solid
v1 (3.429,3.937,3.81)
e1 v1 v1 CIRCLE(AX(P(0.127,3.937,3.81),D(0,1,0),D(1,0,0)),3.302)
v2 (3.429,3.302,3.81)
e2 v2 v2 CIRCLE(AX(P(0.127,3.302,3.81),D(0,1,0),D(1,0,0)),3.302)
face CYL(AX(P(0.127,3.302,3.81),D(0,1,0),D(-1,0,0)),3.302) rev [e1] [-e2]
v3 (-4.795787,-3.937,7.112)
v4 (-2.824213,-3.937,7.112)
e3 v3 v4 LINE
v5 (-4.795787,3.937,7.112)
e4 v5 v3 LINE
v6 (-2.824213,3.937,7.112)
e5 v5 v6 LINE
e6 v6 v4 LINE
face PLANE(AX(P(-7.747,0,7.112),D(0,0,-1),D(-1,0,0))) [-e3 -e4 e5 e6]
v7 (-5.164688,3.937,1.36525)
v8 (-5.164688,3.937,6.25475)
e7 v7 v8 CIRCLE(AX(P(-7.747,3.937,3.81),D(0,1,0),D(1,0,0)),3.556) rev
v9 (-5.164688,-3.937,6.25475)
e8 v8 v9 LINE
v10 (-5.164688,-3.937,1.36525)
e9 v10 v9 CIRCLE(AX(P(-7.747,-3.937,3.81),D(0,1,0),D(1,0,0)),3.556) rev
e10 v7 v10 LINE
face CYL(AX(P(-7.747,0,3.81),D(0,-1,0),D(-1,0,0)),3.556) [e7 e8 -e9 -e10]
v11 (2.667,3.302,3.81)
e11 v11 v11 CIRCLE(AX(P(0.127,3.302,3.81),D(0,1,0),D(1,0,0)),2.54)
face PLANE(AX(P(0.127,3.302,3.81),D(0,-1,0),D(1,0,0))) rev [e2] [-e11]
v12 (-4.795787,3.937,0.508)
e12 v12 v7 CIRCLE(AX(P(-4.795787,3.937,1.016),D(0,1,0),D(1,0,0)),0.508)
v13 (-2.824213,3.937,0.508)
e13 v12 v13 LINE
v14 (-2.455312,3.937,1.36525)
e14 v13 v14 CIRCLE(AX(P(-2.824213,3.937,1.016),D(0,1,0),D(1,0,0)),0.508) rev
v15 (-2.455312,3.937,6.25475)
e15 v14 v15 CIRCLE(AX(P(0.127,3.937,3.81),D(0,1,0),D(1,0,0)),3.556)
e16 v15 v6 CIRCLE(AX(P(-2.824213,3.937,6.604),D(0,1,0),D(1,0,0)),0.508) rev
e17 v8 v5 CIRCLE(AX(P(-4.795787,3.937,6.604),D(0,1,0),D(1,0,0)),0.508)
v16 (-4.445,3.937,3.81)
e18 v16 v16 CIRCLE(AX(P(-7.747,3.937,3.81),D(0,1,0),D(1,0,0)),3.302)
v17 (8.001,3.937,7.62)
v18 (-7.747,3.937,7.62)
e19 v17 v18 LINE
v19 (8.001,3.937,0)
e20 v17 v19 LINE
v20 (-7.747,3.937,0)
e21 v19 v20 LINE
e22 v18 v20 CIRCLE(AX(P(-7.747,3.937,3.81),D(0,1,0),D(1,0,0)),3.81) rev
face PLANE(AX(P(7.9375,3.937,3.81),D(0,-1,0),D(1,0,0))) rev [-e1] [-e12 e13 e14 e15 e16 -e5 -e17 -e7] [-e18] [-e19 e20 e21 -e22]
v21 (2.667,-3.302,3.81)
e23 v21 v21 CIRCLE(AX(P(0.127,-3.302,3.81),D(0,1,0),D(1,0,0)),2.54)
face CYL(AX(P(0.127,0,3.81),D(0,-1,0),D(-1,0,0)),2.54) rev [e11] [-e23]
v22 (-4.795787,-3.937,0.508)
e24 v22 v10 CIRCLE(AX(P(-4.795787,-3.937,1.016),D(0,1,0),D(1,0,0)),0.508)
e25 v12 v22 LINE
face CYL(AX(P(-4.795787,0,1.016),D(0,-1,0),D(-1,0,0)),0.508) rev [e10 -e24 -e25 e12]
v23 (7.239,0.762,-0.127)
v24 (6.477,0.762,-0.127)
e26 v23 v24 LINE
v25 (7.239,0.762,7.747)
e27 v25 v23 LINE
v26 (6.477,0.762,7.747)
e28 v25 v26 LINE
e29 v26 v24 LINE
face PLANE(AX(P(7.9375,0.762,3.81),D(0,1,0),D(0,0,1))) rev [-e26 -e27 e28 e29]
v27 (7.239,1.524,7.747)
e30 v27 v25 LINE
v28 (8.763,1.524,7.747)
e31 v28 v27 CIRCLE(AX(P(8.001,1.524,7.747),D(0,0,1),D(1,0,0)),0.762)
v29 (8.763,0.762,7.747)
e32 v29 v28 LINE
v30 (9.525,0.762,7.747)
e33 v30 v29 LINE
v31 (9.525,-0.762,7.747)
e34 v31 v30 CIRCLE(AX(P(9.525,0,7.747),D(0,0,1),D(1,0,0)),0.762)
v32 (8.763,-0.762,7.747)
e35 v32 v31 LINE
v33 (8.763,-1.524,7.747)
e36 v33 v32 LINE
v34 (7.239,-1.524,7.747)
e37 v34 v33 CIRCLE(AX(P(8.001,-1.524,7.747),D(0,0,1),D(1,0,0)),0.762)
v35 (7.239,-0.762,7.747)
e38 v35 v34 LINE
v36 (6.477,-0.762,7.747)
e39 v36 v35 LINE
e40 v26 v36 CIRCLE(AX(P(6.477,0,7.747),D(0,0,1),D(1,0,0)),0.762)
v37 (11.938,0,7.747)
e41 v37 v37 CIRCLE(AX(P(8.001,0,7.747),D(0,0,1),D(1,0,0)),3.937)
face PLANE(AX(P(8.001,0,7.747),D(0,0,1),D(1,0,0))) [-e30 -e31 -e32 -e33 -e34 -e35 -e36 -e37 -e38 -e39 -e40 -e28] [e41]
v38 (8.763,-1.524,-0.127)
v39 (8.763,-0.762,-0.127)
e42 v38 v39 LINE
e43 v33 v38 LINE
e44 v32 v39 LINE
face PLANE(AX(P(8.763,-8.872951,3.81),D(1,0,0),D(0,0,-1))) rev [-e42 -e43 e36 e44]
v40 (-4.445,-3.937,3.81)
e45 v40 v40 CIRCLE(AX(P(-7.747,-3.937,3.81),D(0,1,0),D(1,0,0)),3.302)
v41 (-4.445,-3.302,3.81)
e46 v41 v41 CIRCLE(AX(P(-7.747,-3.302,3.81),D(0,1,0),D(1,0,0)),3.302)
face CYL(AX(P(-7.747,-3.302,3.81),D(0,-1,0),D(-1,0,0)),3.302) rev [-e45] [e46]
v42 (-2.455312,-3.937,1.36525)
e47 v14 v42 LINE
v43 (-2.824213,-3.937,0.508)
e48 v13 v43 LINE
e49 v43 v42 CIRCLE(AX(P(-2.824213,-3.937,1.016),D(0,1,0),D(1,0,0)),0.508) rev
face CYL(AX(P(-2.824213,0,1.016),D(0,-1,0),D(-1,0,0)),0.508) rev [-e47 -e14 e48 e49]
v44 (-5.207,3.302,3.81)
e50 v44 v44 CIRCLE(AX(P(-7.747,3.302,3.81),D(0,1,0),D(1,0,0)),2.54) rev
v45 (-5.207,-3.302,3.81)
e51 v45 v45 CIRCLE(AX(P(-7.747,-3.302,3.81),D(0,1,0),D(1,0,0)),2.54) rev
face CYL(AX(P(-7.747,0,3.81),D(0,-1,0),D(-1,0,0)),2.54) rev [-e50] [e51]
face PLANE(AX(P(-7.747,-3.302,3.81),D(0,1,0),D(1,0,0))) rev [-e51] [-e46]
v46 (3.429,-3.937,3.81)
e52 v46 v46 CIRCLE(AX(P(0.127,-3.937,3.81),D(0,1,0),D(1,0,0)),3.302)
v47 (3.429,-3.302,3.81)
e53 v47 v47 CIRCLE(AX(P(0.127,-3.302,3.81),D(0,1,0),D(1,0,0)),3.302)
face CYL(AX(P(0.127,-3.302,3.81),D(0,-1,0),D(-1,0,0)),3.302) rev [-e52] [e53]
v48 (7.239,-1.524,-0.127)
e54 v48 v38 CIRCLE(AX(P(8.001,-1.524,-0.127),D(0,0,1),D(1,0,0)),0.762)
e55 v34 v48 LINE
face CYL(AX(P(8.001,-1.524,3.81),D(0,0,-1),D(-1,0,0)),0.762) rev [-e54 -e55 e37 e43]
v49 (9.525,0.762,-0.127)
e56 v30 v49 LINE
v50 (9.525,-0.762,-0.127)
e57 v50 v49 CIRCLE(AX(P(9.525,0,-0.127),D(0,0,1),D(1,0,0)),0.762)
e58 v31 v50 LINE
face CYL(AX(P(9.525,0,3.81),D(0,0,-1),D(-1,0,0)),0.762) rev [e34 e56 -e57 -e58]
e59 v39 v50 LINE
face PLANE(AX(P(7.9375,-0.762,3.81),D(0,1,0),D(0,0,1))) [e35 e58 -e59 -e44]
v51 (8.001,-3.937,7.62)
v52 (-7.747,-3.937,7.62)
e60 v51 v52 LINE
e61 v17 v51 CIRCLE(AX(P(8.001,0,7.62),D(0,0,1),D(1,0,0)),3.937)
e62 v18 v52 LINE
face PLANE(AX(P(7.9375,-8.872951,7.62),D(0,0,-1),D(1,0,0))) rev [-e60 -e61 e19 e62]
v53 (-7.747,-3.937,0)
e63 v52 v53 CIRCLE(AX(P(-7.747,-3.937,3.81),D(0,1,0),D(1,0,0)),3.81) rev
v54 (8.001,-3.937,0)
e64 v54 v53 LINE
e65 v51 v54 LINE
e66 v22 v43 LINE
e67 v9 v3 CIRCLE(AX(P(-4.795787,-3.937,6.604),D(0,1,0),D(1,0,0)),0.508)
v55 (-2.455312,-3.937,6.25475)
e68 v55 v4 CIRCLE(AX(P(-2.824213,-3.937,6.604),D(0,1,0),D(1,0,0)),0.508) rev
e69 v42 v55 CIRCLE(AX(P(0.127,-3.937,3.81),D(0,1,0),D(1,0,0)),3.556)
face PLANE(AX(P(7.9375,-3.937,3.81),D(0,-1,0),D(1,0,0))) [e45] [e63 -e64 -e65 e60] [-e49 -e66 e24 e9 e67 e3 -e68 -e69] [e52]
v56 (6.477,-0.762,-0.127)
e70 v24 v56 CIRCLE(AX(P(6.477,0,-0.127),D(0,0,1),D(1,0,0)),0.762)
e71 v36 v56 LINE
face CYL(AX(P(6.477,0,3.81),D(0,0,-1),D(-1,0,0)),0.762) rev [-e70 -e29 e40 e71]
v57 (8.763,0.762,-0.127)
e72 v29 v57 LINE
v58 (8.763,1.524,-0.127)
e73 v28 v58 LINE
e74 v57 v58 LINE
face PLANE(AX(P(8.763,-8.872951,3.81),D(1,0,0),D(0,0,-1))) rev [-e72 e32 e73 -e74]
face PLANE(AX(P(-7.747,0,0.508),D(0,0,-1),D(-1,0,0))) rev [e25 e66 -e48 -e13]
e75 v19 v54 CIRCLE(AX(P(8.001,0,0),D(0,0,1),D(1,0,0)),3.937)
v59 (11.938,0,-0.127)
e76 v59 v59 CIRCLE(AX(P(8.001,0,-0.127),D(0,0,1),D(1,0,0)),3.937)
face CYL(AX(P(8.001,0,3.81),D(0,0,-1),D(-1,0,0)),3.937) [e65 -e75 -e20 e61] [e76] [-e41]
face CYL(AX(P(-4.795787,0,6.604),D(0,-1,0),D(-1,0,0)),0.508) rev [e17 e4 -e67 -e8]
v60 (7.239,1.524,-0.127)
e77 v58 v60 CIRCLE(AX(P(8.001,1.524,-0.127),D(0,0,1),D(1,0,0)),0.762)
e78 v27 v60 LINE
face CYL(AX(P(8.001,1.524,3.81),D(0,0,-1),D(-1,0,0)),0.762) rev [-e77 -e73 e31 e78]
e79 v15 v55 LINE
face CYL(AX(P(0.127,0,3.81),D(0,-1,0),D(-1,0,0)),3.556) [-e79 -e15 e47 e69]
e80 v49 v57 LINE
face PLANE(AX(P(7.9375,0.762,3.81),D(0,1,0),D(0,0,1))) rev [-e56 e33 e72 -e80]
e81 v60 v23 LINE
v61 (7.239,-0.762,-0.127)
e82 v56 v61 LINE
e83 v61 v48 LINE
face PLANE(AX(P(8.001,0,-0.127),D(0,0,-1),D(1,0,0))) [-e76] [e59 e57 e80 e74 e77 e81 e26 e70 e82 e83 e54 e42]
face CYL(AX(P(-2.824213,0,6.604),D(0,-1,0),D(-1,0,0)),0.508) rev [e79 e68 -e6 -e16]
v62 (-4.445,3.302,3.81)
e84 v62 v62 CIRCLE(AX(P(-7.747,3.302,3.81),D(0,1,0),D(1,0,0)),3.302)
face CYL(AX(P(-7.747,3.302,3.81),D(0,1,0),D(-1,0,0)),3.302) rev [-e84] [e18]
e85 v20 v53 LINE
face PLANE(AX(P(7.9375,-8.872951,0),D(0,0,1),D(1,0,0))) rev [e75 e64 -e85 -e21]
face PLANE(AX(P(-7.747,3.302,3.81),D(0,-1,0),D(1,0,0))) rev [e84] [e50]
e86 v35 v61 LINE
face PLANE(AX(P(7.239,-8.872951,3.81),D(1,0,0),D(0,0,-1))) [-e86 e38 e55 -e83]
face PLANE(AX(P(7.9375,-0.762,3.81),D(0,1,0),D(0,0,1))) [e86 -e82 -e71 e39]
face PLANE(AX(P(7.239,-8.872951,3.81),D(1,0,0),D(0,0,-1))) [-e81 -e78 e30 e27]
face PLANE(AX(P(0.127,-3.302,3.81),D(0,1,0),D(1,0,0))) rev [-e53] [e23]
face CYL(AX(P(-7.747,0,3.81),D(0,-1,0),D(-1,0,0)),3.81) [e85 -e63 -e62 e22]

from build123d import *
from build123d.topology import SkipClean

# Parameters (mm, degrees)
SKETCH1_R                   = 3.429
SKETCH1_R_2                 = 2.54
BOSS_EXTRUDE1_DEPTH         = 3.81
TWOSTRAIGHT_START           = -0.623499004
TWOSTRAIGHT_OUTLINE_R       = 2.54
TWOSTRAIGHT_DEPTH           = 6.604
TWOSTRAIGHT_START_2         = -1.258499004
TWOSTRAIGHT_2_OUTLINE_R     = 3.302
TWOSTRAIGHT_2_DEPTH         = 7.874
BODY_MOVE_COPY3_START       = -4.724057793
BODY_MOVE_COPY3_OUTLINE_R   = 2.54
BODY_MOVE_COPY3_DEPTH       = 7.62
BODY_MOVE_COPY3_2_OUTLINE_R = 2.54
BODY_MOVE_COPY3_2_DEPTH     = 0.787057793
BODY_MOVE_COPY3_START_2     = -3.937
BODY_MOVE_COPY3_3_OUTLINE_R = 2.54
BODY_MOVE_COPY3_3_DEPTH     = 0.635
BODY_MOVE_COPY3_START_3     = -3.302
BODY_MOVE_COPY3_4_OUTLINE_R = 2.54
BODY_MOVE_COPY3_4_DEPTH     = 6.604
BODY_MOVE_COPY3_5_OUTLINE_R = 3.302
BODY_MOVE_COPY3_5_DEPTH     = 7.874
BOSS_EXTRUDE2_DEPTH         = 7.874
BOSS_EXTRUDE3_DEPTH         = 7.874
SKETCH4_R                   = 3.937
BOSS_EXTRUDE4_DEPTH         = 0.127


# Read off the part's stored shape, not the designer's step: TwoStraight, Body-Move/Copy3
with BuildPart() as part:
    # Sketch1 → Boss-Extrude1 (new body)
    # profile 1 of 3: a face of its own
    with BuildSketch(Plane.XY):
        with BuildLine():
            Line((3.937, -3.937), (8.001, -3.937))
            ThreePointArc((8.001, -3.937), (11.938, 0), (8.001, 3.937))
            Line((8.001, 3.937), (3.937, 3.937))
            Line((3.937, 3.937), (3.937, -3.937))
        make_face()
        with Locations((8.001, 0)):
            Circle(SKETCH1_R, mode=Mode.SUBTRACT)
    # profile 2 of 3: a face of its own
    with BuildSketch(Plane.XY):
        with Locations((8.001, 0)):
            Circle(SKETCH1_R)
        with Locations((8.001, 0)):
            Circle(SKETCH1_R_2, mode=Mode.SUBTRACT)
    # profile 3 of 3: a face of its own
    with BuildSketch(Plane.XY):
        with Locations((8.001, 0)):
            Circle(SKETCH1_R_2)
        with BuildLine():
            ThreePointArc((6.477, -0.762), (5.715, 0), (6.477, 0.762))
            Line((6.477, 0.762), (7.239, 0.762))
            Line((7.239, 0.762), (7.239, 1.524))
            ThreePointArc((7.239, 1.524), (8.001, 2.286), (8.763, 1.524))
            Line((8.763, 1.524), (8.763, 0.762))
            Line((8.763, 0.762), (9.525, 0.762))
            ThreePointArc((9.525, 0.762), (10.287, 0), (9.525, -0.762))
            Line((9.525, -0.762), (8.763, -0.762))
            Line((8.763, -0.762), (8.763, -1.524))
            ThreePointArc((8.763, -1.524), (8.001, -2.286), (7.239, -1.524))
            Line((7.239, -1.524), (7.239, -0.762))
            Line((7.239, -0.762), (6.477, -0.762))
        make_face(mode=Mode.SUBTRACT)
    extrude(amount=BOSS_EXTRUDE1_DEPTH)

    # Mirror1: part across plane


with BuildPart() as part_1:
    add(part.part)
    add(part.part.mirror(Plane(origin=(7.9375, -8.872950752, 3.81), x_dir=(1, 0, 0), z_dir=(0, 0, 1))))



with BuildPart() as body_2:
    # TwoStraight outline → TwoStraight (new body)
    with BuildSketch(Plane.XY.offset(TWOSTRAIGHT_START)):
        with BuildLine():
            ThreePointArc((-13.491428018, 2.895942207), (-17.301428018, -0.914057793), (-13.491428018, -4.724057793))
            Line((-13.491428018, -4.724057793), (-5.617428018, -4.724057793))
            ThreePointArc((-5.617428018, -4.724057793), (-1.807428018, -0.914057793), (-5.617428018, 2.895942207))
            Line((-5.617428018, 2.895942207), (-13.491428018, 2.895942207))
        make_face()
        with BuildLine():
            Line((-10.540214708, 2.387942207), (-8.568641328, 2.387942207))
            ThreePointArc((-8.568641328, 2.387942207), (-8.102013532, 2.080746839), (-8.199739664, 1.530692207))
            ThreePointArc((-8.199739664, 1.530692207), (-9.173428018, -0.914057793), (-8.199739664, -3.358807793))
            ThreePointArc((-8.199739664, -3.358807793), (-8.102013532, -3.908862424), (-8.568641328, -4.216057793))
            Line((-8.568641328, -4.216057793), (-10.540214708, -4.216057793))
            ThreePointArc((-10.540214708, -4.216057793), (-11.006842504, -3.908862424), (-10.909116372, -3.358807793))
            ThreePointArc((-10.909116372, -3.358807793), (-9.935428018, -0.914057793), (-10.909116372, 1.530692207))
            ThreePointArc((-10.909116372, 1.530692207), (-11.006842504, 2.080746839), (-10.540214708, 2.387942207))
        make_face(mode=Mode.SUBTRACT)
        with Locations((-13.491428018, -0.914057793)):
            Circle(TWOSTRAIGHT_OUTLINE_R, mode=Mode.SUBTRACT)
        with Locations((-5.617428018, -0.914057793)):
            Circle(TWOSTRAIGHT_OUTLINE_R, mode=Mode.SUBTRACT)
    extrude(amount=TWOSTRAIGHT_DEPTH)

    # TwoStraight 2 outline → TwoStraight 2 (add)
    with BuildSketch(Plane.XY.offset(TWOSTRAIGHT_START_2)):
        with BuildLine():
            ThreePointArc((-13.491428018, 2.895942207), (-17.301428018, -0.914057793), (-13.491428018, -4.724057793))
            Line((-13.491428018, -4.724057793), (-5.617428018, -4.724057793))
            ThreePointArc((-5.617428018, -4.724057793), (-1.807428018, -0.914057793), (-5.617428018, 2.895942207))
            Line((-5.617428018, 2.895942207), (-13.491428018, 2.895942207))
        make_face()
        with Locations((-13.491428018, -0.914057793)):
            Circle(TWOSTRAIGHT_2_OUTLINE_R, mode=Mode.SUBTRACT)
        with BuildLine():
            Line((-10.540214708, 2.387942207), (-8.568641328, 2.387942207))
            ThreePointArc((-8.568641328, 2.387942207), (-8.102013532, 2.080746839), (-8.199739664, 1.530692207))
            ThreePointArc((-8.199739664, 1.530692207), (-9.173428018, -0.914057793), (-8.199739664, -3.358807793))
            ThreePointArc((-8.199739664, -3.358807793), (-8.102013532, -3.908862424), (-8.568641328, -4.216057793))
            Line((-8.568641328, -4.216057793), (-10.540214708, -4.216057793))
            ThreePointArc((-10.540214708, -4.216057793), (-11.006842504, -3.908862424), (-10.909116372, -3.358807793))
            ThreePointArc((-10.909116372, -3.358807793), (-9.935428018, -0.914057793), (-10.909116372, 1.530692207))
            ThreePointArc((-10.909116372, 1.530692207), (-11.006842504, 2.080746839), (-10.540214708, 2.387942207))
        make_face(mode=Mode.SUBTRACT)
        with Locations((-5.617428018, -0.914057793)):
            Circle(TWOSTRAIGHT_2_OUTLINE_R, mode=Mode.SUBTRACT)
    extrude(amount=TWOSTRAIGHT_2_DEPTH)

    # Body-Move/Copy3 outline → Body-Move/Copy3 (cut)
    with BuildSketch(Plane(origin=(0, 0, 0), x_dir=(1, 0, 0), z_dir=(0, 1, 0)).offset(BODY_MOVE_COPY3_START)):
        with BuildLine():
            Line((-7.747, 0), (0.127, 0))
            ThreePointArc((0.127, 0), (3.502330265, -2.042729335), (3.258297722, -5.980500996))
            Line((3.258297722, -5.980500996), (5, -5.980500996))
            Line((5, -5.980500996), (5, 1.258499004))
            Line((5, 1.258499004), (-19, 1.258499004))
            Line((-19, 1.258499004), (-19, -6.615500996))
            Line((-19, -6.615500996), (-10.324840988, -6.615500996))
            ThreePointArc((-10.324840988, -6.615500996), (-11.29700414, -2.426681308), (-7.747, 0))
        make_face()
        with BuildLine():
            Line((-1.192289743, -5.980500996), (1.446289743, -5.980500996))
            ThreePointArc((1.446289743, -5.980500996), (0.127, -1.27), (-1.192289743, -5.980500996))
        make_face()
        with Locations((-7.747, -3.81)):
            Circle(BODY_MOVE_COPY3_OUTLINE_R)
        with BuildLine():
            ThreePointArc((-5.164688354, -6.25475), (-5.269830324, -6.421389396), (-5.303656483, -6.615500996))
            Line((-5.303656483, -6.615500996), (-2.316343517, -6.615500996))
            ThreePointArc((-2.316343517, -6.615500996), (-2.350169676, -6.421389396), (-2.455311646, -6.25475))
            ThreePointArc((-2.455311646, -6.25475), (-3.429, -3.81), (-2.455311646, -1.36525))
            ThreePointArc((-2.455311646, -1.36525), (-2.357585514, -0.815195369), (-2.82421331, -0.508))
            Line((-2.82421331, -0.508), (-4.79578669, -0.508))
            ThreePointArc((-4.79578669, -0.508), (-5.262414486, -0.815195369), (-5.164688354, -1.36525))
            ThreePointArc((-5.164688354, -1.36525), (-4.191, -3.81), (-5.164688354, -6.25475))
        make_face()
    extrude(amount=BODY_MOVE_COPY3_DEPTH, mode=Mode.SUBTRACT)

    # Body-Move_Copy3 2 outline → Body-Move_Copy3 2 (cut)
    with BuildSketch(Plane(origin=(0, 0, 0), x_dir=(1, 0, 0), z_dir=(0, 1, 0)).offset(BODY_MOVE_COPY3_START)):
        with BuildLine():
            Line((0.127, 0), (-7.747, 0))
            ThreePointArc((-7.747, 0), (-11.29700414, -2.426681308), (-10.324840988, -6.615500996))
            Line((-10.324840988, -6.615500996), (-5.303656483, -6.615500996))
            ThreePointArc((-5.303656483, -6.615500996), (-5.269830324, -6.421389396), (-5.164688354, -6.25475))
            ThreePointArc((-5.164688354, -6.25475), (-4.191, -3.81), (-5.164688354, -1.36525))
            ThreePointArc((-5.164688354, -1.36525), (-5.262414486, -0.815195369), (-4.79578669, -0.508))
            Line((-4.79578669, -0.508), (-2.82421331, -0.508))
            ThreePointArc((-2.82421331, -0.508), (-2.357585514, -0.815195369), (-2.455311646, -1.36525))
            ThreePointArc((-2.455311646, -1.36525), (-3.424421255, -3.629603031), (-2.689746603, -5.980500996))
            Line((-2.689746603, -5.980500996), (-2.361398968, -5.980500996))
            ThreePointArc((-2.361398968, -5.980500996), (0.127, -0.508), (2.615398968, -5.980500996))
            Line((2.615398968, -5.980500996), (3.258297722, -5.980500996))
            ThreePointArc((3.258297722, -5.980500996), (3.502330265, -2.042729335), (0.127, 0))
        make_face()
        with Locations((-7.747, -3.81)):
            Circle(BODY_MOVE_COPY3_2_OUTLINE_R, mode=Mode.SUBTRACT)
    extrude(amount=BODY_MOVE_COPY3_2_DEPTH, mode=Mode.SUBTRACT)

    # Body-Move_Copy3 3 outline → Body-Move_Copy3 3 (cut)
    # profile 1 of 2: a face of its own
    with BuildSketch(Plane(origin=(0, 0, 0), x_dir=(1, 0, 0), z_dir=(0, 1, 0)).offset(BODY_MOVE_COPY3_START_2)):
        with BuildLine():
            ThreePointArc((-6.005630378, -6.615500996), (-7.747, -0.508), (-9.488369622, -6.615500996))
            Line((-9.488369622, -6.615500996), (-6.005630378, -6.615500996))
        make_face()
        with Locations((-7.747, -3.81)):
            Circle(BODY_MOVE_COPY3_3_OUTLINE_R, mode=Mode.SUBTRACT)
    # profile 2 of 2: a face of its own
    with BuildSketch(Plane(origin=(0, 0, 0), x_dir=(1, 0, 0), z_dir=(0, 1, 0)).offset(BODY_MOVE_COPY3_START_2)):
        with BuildLine():
            Line((1.446289743, -5.980500996), (2.615398968, -5.980500996))
            ThreePointArc((2.615398968, -5.980500996), (0.127, -0.508), (-2.361398968, -5.980500996))
            Line((-2.361398968, -5.980500996), (-1.192289743, -5.980500996))
            ThreePointArc((-1.192289743, -5.980500996), (0.127, -1.27), (1.446289743, -5.980500996))
        make_face()
    extrude(amount=BODY_MOVE_COPY3_3_DEPTH, mode=Mode.SUBTRACT)

    # Body-Move_Copy3 4 outline → Body-Move_Copy3 4 (add)
    with SkipClean():  # the faces are left unmerged after this step: merging them gives an invalid solid
        with BuildSketch(Plane(origin=(0, 0, 0), x_dir=(1, 0, 0), z_dir=(0, 1, 0)).offset(BODY_MOVE_COPY3_START_3)):
            with BuildLine():
                Line((0.127, 0), (-7.747, 0))
                ThreePointArc((-7.747, 0), (-11.557, -3.81), (-7.747, -7.62))
                Line((-7.747, -7.62), (0.127, -7.62))
                ThreePointArc((0.127, -7.62), (3.937, -3.81), (0.127, 0))
            make_face()
            with BuildLine():
                ThreePointArc((-2.455311646, -1.36525), (-3.429, -3.81), (-2.455311646, -6.25475))
                ThreePointArc((-2.455311646, -6.25475), (-2.357585514, -6.804804631), (-2.82421331, -7.112))
                Line((-2.82421331, -7.112), (-4.79578669, -7.112))
                ThreePointArc((-4.79578669, -7.112), (-5.262414486, -6.804804631), (-5.164688354, -6.25475))
                ThreePointArc((-5.164688354, -6.25475), (-4.191, -3.81), (-5.164688354, -1.36525))
                ThreePointArc((-5.164688354, -1.36525), (-5.262414486, -0.815195369), (-4.79578669, -0.508))
                Line((-4.79578669, -0.508), (-2.82421331, -0.508))
                ThreePointArc((-2.82421331, -0.508), (-2.357585514, -0.815195369), (-2.455311646, -1.36525))
            make_face(mode=Mode.SUBTRACT)
            with Locations((0.127, -3.81)):
                Circle(BODY_MOVE_COPY3_4_OUTLINE_R, mode=Mode.SUBTRACT)
            with Locations((-7.747, -3.81)):
                Circle(BODY_MOVE_COPY3_4_OUTLINE_R, mode=Mode.SUBTRACT)
        extrude(amount=BODY_MOVE_COPY3_4_DEPTH)

    # Body-Move_Copy3 5 outline → Body-Move_Copy3 5 (add)
    with SkipClean():  # the faces are left unmerged after this step: merging them gives an invalid solid
        with BuildSketch(Plane(origin=(0, 0, 0), x_dir=(1, 0, 0), z_dir=(0, 1, 0)).offset(BODY_MOVE_COPY3_START_2)):
            with BuildLine():
                Line((0.127, 0), (-7.747, 0))
                ThreePointArc((-7.747, 0), (-11.557, -3.81), (-7.747, -7.62))
                Line((-7.747, -7.62), (0.127, -7.62))
                ThreePointArc((0.127, -7.62), (3.937, -3.81), (0.127, 0))
            make_face()
            with Locations((0.127, -3.81)):
                Circle(BODY_MOVE_COPY3_5_OUTLINE_R, mode=Mode.SUBTRACT)
            with BuildLine():
                ThreePointArc((-2.455311646, -1.36525), (-3.429, -3.81), (-2.455311646, -6.25475))
                ThreePointArc((-2.455311646, -6.25475), (-2.357585514, -6.804804631), (-2.82421331, -7.112))
                Line((-2.82421331, -7.112), (-4.79578669, -7.112))
                ThreePointArc((-4.79578669, -7.112), (-5.262414486, -6.804804631), (-5.164688354, -6.25475))
                ThreePointArc((-5.164688354, -6.25475), (-4.191, -3.81), (-5.164688354, -1.36525))
                ThreePointArc((-5.164688354, -1.36525), (-5.262414486, -0.815195369), (-4.79578669, -0.508))
                Line((-4.79578669, -0.508), (-2.82421331, -0.508))
                ThreePointArc((-2.82421331, -0.508), (-2.357585514, -0.815195369), (-2.455311646, -1.36525))
            make_face(mode=Mode.SUBTRACT)
            with Locations((-7.747, -3.81)):
                Circle(BODY_MOVE_COPY3_5_OUTLINE_R, mode=Mode.SUBTRACT)
        extrude(amount=BODY_MOVE_COPY3_5_DEPTH)


with BuildPart() as part_2:
    with SkipClean():  # the faces are left unmerged after this step: merging them gives an invalid solid
        add(part_1.part)

        add(body_2.part)  # Boss-Extrude2 merges body 2
        # Sketch2 → Boss-Extrude2 (add)
        with BuildSketch(Plane.XZ.offset(3.937)):
            with BuildLine():
                Line((3.937, 7.62), (3.937, 3.81))
                ThreePointArc((3.937, 3.81), (2.821076836, 6.504076836), (0.127, 7.62))
                Line((0.127, 7.62), (3.937, 7.62))
            make_face()
        extrude(amount=-BOSS_EXTRUDE2_DEPTH)

    # Sketch3 → Boss-Extrude3 (add)
    with SkipClean():  # the faces are left unmerged after this step: merging them gives an invalid solid
        with BuildSketch(Plane.XZ.offset(3.937)):
            with BuildLine():
                Line((3.937, 3.81), (3.937, 0))
                Line((3.937, 0), (0.127, 0))
                ThreePointArc((0.127, 0), (2.821076836, 1.115923164), (3.937, 3.81))
            make_face()
        extrude(amount=-BOSS_EXTRUDE3_DEPTH)

    # Sketch4 → Boss-Extrude4 (add)
    with SkipClean():  # the faces are left unmerged after this step: merging them gives an invalid solid
        with BuildSketch(Plane.XY.offset(7.62)):
            with Locations(Location((8.001, 0, 0), (0, 0, 90))):
                Circle(SKETCH4_R)
            with BuildLine():
                Line((6.477, 0.762), (7.239, 0.762))
                Line((7.239, 0.762), (7.239, 1.524))
                ThreePointArc((7.239, 1.524), (8.001, 2.286), (8.763, 1.524))
                Line((8.763, 1.524), (8.763, 0.762))
                Line((8.763, 0.762), (9.525, 0.762))
                ThreePointArc((9.525, 0.762), (10.287, 0), (9.525, -0.762))
                Line((9.525, -0.762), (8.763, -0.762))
                Line((8.763, -0.762), (8.763, -1.524))
                ThreePointArc((8.763, -1.524), (8.001, -2.286), (7.239, -1.524))
                Line((7.239, -1.524), (7.239, -0.762))
                Line((7.239, -0.762), (6.477, -0.762))
                ThreePointArc((6.477, -0.762), (5.715, 0), (6.477, 0.762))
            make_face(mode=Mode.SUBTRACT)
        boss_extrude4 = extrude(amount=BOSS_EXTRUDE4_DEPTH)

    # Mirror2: Boss-Extrude4 across plane
    with SkipClean():  # the faces are left unmerged after this step: merging them gives an invalid solid
        add(boss_extrude4.mirror(Plane.XY.offset(3.81)))


solid = part_2.part
